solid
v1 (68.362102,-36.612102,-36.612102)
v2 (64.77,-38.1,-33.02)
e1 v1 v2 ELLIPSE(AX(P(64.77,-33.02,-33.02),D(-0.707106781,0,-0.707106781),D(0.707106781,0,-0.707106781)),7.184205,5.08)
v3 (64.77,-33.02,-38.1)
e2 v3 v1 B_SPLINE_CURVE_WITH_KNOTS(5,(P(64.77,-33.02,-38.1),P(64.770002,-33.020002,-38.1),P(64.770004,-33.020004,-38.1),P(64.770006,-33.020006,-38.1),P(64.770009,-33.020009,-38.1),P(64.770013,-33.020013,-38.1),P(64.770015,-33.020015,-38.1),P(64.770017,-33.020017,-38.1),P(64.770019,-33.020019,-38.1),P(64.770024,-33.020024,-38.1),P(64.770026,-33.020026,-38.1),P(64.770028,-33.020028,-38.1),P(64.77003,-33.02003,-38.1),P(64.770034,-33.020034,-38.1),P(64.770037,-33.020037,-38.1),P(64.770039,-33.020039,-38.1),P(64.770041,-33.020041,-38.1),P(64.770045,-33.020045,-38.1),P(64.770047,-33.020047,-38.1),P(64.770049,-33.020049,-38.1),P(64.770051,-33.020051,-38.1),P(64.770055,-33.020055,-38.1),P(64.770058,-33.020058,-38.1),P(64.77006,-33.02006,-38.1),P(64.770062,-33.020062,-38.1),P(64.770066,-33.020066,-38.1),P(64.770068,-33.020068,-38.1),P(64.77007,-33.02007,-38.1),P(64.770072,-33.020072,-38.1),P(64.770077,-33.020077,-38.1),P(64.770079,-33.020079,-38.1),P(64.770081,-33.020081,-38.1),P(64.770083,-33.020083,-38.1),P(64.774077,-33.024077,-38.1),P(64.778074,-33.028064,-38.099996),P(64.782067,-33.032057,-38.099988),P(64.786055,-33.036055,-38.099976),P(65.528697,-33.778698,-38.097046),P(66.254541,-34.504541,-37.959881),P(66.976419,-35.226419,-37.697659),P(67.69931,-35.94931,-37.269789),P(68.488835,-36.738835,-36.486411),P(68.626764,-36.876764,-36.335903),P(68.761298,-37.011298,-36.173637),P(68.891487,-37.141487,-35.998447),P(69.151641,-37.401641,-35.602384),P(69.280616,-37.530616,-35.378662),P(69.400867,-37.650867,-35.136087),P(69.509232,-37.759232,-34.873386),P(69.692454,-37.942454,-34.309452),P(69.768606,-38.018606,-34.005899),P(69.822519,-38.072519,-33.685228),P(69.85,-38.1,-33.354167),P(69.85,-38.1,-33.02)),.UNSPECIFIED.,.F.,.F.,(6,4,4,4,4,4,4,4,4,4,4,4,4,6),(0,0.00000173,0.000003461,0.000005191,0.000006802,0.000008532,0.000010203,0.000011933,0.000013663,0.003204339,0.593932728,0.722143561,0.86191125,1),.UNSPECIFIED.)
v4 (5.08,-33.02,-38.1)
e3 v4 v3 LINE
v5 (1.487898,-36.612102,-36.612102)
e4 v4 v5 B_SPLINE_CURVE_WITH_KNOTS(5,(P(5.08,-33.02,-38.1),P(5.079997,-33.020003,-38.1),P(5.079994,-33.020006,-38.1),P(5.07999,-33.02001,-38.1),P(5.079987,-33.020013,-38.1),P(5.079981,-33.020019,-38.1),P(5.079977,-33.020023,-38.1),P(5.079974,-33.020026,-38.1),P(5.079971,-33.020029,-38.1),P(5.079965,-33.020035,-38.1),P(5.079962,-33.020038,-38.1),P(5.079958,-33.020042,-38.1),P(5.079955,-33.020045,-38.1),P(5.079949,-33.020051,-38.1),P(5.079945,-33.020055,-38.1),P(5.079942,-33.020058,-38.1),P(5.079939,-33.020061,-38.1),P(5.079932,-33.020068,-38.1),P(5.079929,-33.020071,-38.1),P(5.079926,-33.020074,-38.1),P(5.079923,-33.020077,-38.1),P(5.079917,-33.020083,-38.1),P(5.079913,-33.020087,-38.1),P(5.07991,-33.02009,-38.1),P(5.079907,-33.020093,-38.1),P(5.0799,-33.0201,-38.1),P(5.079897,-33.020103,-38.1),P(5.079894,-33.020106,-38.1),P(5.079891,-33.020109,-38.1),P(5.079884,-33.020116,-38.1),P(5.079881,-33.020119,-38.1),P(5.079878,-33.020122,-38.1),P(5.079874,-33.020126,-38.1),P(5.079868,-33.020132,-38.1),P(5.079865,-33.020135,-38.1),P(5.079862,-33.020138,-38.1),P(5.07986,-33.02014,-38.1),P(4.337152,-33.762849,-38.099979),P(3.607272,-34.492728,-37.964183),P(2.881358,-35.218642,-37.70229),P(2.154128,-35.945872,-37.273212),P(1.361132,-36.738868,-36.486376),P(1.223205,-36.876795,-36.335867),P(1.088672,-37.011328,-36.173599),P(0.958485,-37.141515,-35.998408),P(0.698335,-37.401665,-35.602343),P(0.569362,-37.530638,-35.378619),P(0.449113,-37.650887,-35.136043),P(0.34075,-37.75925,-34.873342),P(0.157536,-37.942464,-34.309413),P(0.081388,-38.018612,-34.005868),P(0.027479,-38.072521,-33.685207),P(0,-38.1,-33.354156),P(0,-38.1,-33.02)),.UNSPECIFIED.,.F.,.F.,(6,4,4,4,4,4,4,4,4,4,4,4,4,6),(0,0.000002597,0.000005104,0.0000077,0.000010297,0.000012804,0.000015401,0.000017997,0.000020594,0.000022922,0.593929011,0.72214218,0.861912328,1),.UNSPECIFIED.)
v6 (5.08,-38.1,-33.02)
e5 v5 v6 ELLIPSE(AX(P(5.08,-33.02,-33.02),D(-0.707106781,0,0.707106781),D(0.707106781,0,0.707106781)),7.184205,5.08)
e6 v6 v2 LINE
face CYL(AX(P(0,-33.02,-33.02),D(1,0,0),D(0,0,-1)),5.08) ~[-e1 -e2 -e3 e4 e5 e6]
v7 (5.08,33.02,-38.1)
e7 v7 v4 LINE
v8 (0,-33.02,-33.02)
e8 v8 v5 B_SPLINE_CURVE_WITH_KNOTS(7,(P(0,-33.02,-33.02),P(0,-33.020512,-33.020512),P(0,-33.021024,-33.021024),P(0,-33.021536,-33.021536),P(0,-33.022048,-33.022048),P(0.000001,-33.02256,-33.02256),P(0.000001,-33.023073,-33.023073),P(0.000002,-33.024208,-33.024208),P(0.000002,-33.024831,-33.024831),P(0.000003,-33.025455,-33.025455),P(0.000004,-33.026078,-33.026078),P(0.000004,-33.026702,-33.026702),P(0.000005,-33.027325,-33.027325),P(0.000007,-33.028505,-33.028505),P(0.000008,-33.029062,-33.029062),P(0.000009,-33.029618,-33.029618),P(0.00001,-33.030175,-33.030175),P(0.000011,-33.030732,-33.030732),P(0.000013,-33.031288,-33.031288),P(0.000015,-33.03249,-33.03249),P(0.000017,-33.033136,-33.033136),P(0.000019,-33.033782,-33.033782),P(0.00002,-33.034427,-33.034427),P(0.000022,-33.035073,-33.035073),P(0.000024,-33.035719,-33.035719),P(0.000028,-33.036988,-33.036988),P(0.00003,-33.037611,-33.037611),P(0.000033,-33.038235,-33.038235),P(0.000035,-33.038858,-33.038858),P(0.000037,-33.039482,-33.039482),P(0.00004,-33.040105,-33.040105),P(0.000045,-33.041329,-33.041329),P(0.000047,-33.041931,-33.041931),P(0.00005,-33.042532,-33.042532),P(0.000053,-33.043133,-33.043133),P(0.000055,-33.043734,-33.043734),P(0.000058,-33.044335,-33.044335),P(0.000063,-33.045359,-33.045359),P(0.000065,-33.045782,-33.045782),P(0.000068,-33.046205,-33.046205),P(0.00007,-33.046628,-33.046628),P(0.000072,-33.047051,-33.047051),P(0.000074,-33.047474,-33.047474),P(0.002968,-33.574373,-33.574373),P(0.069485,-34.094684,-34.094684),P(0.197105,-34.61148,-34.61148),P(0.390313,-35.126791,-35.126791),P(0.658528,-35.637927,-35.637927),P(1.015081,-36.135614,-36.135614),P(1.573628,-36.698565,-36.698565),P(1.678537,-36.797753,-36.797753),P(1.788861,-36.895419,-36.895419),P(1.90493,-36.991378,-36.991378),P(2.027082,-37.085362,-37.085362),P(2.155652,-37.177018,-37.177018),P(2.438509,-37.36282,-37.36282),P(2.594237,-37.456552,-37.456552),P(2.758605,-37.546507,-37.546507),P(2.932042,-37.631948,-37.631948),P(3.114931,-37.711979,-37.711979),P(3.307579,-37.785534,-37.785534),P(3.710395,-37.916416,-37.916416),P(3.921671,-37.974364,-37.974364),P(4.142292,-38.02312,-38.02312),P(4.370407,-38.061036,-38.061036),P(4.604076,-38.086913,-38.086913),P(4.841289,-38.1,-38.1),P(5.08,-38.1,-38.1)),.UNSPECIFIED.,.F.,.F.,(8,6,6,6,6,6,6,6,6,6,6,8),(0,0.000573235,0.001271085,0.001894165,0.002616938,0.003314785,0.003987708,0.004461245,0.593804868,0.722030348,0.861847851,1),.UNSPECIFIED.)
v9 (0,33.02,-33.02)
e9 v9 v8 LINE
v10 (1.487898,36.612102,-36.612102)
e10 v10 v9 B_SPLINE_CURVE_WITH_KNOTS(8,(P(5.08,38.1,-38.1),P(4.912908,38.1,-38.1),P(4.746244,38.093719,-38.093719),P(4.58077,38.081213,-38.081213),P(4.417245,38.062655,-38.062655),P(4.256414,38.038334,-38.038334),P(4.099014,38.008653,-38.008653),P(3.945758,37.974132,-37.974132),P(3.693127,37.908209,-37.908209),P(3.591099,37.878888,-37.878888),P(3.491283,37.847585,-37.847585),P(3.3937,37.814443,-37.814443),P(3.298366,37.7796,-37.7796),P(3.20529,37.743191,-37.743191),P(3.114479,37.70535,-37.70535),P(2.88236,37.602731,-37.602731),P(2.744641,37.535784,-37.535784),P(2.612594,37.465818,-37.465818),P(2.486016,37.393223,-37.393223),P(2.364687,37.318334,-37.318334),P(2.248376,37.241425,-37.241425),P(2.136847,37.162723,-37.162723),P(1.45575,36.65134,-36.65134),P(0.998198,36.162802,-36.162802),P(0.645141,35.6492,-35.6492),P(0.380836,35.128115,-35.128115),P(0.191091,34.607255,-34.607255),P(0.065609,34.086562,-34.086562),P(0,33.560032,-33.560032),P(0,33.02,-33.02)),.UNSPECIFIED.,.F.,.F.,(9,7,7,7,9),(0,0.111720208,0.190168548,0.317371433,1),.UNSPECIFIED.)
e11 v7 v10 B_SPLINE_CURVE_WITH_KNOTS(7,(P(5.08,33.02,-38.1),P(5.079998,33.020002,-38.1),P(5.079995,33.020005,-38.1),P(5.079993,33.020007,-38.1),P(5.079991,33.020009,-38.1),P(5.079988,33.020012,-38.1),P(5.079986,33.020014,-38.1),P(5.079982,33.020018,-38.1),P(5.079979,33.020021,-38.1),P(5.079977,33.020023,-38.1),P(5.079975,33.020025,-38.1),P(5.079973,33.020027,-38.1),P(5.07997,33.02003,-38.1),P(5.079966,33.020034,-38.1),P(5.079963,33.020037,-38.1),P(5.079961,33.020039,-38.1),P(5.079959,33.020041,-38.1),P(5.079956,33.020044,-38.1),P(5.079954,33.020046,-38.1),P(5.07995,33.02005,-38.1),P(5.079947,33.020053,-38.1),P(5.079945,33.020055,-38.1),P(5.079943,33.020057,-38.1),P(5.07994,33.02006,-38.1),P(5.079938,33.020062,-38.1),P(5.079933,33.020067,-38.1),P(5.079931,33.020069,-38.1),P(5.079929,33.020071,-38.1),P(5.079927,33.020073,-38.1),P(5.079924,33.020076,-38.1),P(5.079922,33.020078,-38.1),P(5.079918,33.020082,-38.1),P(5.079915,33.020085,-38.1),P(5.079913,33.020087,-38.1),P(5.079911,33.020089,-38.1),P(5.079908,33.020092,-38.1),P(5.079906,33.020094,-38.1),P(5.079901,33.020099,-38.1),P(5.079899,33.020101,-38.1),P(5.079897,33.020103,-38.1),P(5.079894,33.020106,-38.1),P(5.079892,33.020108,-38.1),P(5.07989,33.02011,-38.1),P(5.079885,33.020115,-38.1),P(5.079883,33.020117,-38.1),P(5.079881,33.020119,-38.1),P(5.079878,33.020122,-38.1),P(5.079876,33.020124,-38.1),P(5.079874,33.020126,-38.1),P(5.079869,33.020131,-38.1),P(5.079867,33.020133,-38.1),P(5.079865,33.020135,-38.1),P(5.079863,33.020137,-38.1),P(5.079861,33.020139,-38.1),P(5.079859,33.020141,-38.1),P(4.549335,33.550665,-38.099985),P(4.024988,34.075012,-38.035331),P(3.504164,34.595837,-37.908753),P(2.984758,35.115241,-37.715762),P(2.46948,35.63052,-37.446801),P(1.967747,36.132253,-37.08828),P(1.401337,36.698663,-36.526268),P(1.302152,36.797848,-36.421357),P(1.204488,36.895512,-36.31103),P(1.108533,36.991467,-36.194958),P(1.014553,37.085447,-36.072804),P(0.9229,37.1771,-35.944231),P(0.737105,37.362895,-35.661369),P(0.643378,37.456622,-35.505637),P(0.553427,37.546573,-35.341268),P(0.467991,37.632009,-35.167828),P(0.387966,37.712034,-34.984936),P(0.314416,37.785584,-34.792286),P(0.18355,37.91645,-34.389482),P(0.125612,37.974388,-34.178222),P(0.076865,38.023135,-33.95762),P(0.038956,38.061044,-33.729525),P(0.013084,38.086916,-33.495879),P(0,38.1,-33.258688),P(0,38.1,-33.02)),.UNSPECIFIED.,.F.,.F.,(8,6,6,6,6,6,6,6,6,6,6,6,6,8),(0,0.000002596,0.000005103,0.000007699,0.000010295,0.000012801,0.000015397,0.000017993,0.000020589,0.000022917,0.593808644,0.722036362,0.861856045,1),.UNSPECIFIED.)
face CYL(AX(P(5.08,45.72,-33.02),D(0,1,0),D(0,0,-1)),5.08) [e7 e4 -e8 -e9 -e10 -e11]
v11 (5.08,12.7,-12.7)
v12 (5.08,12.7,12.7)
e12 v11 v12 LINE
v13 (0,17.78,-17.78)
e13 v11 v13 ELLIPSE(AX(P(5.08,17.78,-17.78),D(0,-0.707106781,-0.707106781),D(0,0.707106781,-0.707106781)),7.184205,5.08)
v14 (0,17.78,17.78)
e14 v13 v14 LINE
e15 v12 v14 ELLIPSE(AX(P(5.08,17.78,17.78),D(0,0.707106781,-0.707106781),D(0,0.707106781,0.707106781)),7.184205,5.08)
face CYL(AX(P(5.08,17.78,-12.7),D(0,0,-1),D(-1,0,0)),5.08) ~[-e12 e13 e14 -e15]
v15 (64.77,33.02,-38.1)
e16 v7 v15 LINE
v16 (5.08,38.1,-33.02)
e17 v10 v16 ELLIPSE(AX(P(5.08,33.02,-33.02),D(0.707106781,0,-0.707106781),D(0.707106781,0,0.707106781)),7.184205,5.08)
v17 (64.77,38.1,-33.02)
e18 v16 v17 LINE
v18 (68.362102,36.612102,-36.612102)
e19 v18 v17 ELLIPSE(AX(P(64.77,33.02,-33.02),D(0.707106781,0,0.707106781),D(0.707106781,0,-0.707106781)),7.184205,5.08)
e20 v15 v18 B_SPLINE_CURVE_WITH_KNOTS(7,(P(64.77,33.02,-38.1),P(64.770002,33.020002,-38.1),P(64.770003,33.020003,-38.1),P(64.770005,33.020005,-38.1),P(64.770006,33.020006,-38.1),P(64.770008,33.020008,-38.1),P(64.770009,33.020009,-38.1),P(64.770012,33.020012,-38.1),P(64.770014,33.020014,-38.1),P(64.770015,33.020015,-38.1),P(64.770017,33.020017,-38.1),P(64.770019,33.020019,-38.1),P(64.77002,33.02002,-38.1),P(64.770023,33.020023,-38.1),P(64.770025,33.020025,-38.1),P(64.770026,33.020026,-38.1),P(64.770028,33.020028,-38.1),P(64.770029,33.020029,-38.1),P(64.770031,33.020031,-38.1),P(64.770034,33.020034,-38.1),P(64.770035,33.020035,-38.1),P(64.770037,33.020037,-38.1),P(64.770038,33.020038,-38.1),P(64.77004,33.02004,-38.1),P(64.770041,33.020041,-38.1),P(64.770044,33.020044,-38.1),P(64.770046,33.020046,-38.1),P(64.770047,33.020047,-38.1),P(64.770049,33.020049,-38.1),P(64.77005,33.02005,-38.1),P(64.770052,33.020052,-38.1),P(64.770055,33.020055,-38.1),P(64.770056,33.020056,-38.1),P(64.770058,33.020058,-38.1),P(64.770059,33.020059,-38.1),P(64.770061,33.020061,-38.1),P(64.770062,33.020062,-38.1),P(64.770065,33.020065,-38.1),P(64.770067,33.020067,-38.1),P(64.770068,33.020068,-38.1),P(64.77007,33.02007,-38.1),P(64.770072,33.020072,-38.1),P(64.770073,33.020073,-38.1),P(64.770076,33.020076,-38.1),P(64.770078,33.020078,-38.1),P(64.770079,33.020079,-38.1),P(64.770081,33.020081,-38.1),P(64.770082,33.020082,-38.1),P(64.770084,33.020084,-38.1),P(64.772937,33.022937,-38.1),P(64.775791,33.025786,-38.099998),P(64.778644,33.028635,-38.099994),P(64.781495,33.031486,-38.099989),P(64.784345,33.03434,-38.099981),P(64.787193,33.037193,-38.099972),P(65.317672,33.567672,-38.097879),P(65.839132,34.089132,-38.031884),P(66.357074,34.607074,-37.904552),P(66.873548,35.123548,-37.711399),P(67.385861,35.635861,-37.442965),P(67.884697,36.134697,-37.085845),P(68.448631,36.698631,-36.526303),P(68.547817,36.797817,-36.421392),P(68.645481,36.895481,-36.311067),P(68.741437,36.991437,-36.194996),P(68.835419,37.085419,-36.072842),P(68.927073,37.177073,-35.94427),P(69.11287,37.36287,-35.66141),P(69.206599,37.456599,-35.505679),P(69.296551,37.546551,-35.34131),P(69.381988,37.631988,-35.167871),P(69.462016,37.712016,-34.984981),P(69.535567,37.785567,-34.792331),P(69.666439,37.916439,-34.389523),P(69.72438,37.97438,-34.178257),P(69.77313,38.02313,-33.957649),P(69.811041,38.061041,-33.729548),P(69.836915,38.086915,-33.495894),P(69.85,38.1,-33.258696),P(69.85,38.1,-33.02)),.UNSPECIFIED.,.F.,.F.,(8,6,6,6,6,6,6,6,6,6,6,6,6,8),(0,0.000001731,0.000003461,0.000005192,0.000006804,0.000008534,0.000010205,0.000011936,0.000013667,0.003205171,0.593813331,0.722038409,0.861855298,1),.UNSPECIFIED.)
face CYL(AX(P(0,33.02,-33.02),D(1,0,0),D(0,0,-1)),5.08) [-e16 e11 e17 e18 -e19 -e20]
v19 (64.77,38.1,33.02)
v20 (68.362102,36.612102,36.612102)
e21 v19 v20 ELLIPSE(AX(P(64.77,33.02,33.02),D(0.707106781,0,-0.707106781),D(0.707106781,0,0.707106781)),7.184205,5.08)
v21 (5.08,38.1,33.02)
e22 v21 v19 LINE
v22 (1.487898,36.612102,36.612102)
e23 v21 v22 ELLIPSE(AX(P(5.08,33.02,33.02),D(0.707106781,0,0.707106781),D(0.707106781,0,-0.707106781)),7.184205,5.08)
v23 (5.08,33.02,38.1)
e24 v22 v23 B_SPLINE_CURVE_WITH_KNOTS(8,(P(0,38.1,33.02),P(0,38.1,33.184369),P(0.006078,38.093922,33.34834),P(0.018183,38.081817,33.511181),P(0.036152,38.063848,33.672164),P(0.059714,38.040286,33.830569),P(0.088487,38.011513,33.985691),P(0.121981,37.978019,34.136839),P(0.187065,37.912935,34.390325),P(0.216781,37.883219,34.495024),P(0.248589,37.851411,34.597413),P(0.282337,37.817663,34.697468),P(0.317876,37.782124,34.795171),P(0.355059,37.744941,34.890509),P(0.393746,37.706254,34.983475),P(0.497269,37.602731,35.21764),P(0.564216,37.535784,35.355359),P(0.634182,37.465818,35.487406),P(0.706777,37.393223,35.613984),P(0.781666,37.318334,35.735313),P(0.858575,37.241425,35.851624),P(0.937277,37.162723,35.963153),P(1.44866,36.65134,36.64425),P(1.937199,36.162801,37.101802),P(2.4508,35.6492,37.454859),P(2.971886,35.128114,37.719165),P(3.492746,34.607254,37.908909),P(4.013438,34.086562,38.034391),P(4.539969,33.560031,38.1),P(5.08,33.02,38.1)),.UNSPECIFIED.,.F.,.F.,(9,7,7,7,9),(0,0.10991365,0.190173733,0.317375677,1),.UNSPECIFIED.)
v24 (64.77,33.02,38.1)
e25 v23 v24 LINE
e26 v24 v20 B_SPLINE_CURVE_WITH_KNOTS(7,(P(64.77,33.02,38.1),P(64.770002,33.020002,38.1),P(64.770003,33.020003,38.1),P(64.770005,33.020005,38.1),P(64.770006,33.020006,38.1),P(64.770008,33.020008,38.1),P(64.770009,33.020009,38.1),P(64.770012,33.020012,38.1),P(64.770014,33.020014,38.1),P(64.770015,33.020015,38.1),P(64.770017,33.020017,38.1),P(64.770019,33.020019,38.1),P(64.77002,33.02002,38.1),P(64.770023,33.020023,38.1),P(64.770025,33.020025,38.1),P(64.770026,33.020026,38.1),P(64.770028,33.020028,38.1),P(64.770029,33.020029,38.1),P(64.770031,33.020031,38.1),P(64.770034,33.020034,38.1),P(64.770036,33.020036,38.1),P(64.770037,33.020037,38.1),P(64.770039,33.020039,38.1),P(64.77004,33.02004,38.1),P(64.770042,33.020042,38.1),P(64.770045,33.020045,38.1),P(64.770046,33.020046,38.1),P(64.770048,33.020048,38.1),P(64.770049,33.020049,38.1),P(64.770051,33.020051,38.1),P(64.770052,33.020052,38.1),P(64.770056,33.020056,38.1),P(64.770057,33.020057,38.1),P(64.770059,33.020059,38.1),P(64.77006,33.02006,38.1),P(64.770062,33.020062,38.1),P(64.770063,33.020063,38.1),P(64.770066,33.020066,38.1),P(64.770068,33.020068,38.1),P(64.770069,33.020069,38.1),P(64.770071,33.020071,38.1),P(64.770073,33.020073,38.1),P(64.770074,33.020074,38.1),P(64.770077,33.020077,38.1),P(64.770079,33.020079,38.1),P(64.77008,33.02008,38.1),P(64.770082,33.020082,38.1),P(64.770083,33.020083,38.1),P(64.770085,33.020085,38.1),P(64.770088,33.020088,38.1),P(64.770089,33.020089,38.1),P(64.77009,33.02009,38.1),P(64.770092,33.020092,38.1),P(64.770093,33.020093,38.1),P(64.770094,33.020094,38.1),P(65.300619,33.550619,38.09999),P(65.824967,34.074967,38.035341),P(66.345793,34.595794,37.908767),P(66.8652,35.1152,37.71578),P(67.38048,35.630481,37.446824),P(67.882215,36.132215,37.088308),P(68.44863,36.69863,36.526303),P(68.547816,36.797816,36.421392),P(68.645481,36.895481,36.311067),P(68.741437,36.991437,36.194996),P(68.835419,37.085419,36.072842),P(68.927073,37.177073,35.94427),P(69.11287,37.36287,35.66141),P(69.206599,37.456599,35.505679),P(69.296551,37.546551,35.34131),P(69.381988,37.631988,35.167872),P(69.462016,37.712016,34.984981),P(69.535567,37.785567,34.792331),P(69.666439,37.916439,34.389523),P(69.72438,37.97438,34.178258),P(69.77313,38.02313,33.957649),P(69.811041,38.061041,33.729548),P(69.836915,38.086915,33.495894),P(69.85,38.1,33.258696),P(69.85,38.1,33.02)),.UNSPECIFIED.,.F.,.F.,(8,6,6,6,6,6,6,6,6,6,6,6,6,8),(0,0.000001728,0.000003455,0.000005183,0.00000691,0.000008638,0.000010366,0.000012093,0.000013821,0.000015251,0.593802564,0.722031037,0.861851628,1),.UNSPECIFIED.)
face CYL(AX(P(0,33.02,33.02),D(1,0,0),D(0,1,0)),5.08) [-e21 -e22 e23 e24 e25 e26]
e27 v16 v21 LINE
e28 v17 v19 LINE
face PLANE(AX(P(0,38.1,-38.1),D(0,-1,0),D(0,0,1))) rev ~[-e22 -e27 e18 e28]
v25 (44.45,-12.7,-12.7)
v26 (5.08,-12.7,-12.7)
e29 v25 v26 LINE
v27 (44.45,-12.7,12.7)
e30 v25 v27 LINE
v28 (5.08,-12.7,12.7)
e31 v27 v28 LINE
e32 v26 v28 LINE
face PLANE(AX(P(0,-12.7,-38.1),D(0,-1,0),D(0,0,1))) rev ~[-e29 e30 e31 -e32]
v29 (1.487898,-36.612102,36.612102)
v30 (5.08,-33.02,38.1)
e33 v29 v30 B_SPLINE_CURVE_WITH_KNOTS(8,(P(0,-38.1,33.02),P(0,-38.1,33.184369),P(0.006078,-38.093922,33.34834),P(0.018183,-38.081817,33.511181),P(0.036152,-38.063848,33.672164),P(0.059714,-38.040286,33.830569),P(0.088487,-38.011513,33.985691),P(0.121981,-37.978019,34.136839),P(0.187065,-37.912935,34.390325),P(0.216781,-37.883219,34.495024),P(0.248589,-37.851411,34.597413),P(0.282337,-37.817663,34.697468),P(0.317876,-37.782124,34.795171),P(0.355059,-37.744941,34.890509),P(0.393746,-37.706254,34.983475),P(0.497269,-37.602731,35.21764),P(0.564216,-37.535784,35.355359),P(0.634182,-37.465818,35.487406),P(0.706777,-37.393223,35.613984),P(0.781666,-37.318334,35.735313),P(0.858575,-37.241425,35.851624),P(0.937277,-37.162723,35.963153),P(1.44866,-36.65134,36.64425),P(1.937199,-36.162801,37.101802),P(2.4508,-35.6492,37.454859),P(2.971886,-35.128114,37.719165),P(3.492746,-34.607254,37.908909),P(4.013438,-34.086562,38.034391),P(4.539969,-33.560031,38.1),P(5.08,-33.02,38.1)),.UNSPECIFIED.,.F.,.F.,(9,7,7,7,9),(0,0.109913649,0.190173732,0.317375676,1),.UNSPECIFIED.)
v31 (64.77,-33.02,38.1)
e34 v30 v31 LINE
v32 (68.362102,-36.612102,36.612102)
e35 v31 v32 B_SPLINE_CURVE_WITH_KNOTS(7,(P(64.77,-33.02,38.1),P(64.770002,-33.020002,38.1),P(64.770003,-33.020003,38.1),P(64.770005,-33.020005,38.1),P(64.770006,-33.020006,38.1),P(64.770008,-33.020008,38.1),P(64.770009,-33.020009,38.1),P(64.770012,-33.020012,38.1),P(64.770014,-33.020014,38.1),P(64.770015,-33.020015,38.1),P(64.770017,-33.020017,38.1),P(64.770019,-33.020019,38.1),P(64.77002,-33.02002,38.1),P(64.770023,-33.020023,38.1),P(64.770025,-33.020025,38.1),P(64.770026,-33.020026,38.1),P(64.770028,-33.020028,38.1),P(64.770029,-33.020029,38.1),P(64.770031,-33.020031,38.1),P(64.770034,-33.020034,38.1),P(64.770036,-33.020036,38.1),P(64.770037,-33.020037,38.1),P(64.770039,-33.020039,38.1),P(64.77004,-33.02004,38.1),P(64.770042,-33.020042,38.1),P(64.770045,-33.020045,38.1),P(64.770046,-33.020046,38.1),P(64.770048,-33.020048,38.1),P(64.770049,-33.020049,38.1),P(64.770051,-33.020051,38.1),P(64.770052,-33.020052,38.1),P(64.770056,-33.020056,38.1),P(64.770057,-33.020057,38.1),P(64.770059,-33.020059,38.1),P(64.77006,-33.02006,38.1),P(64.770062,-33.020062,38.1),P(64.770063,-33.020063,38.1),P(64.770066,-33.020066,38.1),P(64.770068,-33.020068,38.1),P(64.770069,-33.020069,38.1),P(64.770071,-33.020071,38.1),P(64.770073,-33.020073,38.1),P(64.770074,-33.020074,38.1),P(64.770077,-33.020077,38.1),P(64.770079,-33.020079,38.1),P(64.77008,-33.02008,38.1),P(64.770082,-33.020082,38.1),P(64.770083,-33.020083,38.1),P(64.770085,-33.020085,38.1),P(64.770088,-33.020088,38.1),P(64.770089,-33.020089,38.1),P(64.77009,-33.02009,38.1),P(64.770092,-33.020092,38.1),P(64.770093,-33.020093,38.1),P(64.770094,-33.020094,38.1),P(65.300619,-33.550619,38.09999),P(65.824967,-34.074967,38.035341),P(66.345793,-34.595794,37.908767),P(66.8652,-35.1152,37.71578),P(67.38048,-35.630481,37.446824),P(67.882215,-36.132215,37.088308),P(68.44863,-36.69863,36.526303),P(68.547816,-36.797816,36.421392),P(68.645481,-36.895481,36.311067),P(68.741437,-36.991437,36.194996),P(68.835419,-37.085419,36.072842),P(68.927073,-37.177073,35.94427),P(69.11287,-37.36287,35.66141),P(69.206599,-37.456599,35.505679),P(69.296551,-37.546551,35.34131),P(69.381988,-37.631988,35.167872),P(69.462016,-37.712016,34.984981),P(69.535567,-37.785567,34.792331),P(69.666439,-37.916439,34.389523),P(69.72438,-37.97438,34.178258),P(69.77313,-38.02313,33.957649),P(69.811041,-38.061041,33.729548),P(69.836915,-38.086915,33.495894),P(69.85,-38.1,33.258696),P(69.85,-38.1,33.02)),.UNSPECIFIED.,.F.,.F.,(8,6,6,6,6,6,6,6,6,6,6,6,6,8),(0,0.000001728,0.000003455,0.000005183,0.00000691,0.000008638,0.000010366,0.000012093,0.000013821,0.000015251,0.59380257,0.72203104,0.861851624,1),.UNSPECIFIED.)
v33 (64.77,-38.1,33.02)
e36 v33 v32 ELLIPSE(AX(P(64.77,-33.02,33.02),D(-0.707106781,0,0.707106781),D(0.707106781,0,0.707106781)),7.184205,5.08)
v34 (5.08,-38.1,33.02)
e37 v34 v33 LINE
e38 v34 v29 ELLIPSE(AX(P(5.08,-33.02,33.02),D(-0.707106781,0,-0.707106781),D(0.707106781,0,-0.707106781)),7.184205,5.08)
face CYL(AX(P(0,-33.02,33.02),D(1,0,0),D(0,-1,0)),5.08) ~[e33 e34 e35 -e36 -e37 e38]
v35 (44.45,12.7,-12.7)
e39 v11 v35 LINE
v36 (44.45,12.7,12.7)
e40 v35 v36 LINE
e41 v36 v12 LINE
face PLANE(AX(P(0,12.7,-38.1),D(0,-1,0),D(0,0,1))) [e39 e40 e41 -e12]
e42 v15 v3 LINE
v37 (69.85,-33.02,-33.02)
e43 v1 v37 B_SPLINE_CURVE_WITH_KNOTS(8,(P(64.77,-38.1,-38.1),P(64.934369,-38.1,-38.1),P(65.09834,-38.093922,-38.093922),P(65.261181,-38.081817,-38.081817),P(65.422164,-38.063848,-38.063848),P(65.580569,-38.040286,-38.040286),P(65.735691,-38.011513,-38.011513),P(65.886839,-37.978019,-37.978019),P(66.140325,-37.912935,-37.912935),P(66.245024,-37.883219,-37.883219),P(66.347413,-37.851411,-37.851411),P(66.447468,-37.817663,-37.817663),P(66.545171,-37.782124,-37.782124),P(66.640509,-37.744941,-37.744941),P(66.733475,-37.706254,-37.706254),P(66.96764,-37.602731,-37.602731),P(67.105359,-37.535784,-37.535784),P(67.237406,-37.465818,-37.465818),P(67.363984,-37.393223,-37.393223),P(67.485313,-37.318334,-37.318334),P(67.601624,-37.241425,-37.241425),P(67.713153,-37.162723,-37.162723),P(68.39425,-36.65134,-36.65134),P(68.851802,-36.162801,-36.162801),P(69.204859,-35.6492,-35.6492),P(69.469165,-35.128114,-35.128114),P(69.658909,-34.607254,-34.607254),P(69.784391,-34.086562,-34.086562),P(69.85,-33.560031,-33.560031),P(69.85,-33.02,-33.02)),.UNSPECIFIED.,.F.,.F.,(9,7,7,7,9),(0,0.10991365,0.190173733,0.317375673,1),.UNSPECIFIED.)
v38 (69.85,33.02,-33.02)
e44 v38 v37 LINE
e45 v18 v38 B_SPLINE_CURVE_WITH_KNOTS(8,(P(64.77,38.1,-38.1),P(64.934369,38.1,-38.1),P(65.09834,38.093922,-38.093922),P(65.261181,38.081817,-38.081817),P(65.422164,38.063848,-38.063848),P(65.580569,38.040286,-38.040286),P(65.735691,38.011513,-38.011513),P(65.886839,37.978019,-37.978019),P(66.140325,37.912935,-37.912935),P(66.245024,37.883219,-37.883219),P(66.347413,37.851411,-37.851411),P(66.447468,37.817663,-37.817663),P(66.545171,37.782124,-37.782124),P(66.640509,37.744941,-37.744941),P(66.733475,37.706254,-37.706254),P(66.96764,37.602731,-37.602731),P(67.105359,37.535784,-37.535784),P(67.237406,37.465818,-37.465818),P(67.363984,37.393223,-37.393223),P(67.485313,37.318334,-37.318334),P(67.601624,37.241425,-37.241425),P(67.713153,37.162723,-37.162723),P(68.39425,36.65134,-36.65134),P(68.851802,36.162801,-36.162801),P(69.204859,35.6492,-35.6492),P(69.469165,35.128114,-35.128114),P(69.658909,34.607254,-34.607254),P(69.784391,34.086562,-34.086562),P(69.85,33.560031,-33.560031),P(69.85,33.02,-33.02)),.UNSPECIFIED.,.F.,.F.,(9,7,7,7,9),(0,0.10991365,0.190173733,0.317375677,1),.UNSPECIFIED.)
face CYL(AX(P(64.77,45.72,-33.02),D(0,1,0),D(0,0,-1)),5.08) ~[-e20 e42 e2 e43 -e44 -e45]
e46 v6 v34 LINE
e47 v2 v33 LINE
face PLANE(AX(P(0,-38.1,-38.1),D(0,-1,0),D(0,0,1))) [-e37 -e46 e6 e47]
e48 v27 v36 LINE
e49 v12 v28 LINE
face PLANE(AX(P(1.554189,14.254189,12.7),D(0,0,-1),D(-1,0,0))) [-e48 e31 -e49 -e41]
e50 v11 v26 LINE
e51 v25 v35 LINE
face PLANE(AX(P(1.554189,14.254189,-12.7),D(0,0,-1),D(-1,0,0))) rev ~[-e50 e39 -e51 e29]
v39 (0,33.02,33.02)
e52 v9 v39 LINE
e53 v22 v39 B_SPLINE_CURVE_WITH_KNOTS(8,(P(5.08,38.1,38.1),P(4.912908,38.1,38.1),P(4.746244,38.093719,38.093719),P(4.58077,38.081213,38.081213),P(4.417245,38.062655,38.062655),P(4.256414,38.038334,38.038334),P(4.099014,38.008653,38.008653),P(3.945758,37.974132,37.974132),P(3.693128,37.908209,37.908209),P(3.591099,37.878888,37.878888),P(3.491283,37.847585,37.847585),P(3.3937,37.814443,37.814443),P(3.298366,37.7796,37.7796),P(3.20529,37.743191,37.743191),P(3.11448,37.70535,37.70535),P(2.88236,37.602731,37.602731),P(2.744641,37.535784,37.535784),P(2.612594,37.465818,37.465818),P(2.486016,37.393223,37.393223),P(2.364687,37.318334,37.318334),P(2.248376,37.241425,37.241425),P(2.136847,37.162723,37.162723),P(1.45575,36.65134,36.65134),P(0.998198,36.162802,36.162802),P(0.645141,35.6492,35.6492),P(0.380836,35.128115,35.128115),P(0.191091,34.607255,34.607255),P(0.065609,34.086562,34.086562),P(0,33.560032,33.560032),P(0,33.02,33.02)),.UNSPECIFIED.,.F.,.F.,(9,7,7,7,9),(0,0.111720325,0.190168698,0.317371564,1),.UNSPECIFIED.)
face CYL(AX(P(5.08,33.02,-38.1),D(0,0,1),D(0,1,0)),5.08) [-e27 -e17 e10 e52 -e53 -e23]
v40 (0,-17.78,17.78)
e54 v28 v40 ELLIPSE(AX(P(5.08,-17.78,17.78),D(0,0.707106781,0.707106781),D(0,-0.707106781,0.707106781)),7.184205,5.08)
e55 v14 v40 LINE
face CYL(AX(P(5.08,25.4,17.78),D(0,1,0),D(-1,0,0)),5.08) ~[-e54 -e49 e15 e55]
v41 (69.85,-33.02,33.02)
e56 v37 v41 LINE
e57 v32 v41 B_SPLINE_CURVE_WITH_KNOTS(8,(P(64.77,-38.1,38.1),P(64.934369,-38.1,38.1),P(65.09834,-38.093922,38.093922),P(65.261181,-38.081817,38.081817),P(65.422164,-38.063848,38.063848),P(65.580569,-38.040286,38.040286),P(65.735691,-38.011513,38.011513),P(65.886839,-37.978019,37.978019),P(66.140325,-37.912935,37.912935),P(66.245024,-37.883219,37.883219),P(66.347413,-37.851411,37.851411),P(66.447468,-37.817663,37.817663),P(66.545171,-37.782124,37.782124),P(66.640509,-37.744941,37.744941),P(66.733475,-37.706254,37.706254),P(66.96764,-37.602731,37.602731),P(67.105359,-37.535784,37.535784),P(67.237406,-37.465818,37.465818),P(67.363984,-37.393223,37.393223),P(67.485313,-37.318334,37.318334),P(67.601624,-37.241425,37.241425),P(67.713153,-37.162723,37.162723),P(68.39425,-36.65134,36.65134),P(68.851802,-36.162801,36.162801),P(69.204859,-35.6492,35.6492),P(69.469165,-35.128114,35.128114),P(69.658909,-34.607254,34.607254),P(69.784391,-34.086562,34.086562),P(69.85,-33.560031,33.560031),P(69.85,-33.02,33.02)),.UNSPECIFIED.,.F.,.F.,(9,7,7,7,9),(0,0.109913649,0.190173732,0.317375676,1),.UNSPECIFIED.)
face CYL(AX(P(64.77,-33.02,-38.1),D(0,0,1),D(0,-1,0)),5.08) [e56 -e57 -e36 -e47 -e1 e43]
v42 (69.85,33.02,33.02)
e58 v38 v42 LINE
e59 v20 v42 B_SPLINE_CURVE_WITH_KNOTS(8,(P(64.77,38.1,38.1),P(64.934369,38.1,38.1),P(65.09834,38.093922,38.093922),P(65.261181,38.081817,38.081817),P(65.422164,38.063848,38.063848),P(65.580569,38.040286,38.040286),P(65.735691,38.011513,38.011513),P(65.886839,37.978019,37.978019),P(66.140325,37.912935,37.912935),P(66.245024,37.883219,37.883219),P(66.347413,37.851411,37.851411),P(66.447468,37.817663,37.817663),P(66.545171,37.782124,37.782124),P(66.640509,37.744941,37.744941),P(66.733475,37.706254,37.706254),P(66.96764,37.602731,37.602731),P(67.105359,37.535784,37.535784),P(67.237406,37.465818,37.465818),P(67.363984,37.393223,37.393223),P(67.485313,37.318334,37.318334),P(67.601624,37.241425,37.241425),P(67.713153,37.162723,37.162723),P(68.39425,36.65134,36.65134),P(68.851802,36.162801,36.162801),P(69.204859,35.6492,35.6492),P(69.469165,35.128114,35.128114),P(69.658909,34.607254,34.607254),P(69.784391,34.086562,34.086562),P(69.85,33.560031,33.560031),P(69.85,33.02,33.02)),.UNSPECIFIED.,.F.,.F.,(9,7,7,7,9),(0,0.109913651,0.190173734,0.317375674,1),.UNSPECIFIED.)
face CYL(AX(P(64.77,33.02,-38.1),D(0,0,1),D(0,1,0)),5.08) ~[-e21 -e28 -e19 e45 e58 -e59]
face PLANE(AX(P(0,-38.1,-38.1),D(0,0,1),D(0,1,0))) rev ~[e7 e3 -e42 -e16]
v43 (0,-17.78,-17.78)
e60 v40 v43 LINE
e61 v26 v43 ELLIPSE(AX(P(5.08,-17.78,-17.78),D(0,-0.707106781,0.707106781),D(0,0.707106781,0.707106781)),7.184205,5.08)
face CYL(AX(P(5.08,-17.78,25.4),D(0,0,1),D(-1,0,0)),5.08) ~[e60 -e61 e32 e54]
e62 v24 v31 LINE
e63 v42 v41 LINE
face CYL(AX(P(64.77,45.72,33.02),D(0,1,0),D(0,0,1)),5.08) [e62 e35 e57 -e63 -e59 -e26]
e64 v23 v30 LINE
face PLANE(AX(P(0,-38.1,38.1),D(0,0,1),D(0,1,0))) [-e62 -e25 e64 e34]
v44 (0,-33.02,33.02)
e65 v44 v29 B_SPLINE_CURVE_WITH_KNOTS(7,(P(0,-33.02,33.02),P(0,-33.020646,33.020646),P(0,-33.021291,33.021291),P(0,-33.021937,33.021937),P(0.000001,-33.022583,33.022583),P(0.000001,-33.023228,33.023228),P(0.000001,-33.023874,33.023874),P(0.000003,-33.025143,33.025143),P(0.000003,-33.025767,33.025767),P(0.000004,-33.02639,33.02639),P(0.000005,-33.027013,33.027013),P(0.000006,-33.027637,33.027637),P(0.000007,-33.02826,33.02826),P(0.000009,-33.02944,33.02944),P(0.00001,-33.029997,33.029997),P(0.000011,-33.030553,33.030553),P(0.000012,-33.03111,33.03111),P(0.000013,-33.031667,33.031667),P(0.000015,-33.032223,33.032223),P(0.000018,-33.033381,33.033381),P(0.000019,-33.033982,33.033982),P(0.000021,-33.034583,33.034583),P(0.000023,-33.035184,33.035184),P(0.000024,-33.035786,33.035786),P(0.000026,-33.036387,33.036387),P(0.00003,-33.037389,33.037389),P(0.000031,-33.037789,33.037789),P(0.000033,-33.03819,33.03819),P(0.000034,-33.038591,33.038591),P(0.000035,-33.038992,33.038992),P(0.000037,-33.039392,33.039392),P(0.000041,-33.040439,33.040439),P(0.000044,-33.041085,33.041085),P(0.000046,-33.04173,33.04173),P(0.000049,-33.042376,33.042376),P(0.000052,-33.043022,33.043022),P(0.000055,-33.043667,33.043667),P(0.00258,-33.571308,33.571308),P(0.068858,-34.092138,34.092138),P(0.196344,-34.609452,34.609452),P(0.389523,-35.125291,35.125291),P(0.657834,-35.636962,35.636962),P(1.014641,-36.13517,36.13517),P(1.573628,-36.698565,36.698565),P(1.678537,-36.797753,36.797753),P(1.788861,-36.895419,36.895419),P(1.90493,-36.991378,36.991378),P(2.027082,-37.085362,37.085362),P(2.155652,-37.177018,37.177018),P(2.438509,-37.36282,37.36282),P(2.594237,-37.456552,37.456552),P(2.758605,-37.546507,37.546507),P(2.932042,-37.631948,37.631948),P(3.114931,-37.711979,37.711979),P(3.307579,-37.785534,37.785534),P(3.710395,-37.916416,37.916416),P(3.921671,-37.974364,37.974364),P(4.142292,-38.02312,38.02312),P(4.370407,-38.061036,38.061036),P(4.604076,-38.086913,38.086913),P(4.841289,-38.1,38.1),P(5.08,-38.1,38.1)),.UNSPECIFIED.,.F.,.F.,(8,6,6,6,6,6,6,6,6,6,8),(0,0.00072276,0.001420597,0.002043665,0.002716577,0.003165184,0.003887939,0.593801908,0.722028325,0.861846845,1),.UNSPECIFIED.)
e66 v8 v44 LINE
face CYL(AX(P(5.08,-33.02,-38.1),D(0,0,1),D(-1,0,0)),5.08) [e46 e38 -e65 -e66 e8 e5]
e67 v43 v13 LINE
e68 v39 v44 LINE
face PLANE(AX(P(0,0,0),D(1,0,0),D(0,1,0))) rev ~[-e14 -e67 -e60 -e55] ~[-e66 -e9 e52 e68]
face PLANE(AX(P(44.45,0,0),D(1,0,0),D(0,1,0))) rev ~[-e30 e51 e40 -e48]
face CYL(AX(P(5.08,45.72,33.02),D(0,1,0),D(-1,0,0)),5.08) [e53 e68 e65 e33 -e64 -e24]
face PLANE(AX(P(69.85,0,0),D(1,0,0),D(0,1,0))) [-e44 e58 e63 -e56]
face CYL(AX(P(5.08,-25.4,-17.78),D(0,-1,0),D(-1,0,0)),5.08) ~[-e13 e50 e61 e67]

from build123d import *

# Parameters (mm, degrees)
F0_W         = 76.2
F0_H         = 76.2
F1_DEPTH     = 69.85
F2_T         = -25.4
F3_R         = 5.08
F4_R         = 5.08
F5_T1_DEPTH  = 91.44
F5_T3_DEPTH  = 25.4
F5_T5_DEPTH  = 25.4
F5_T11_DEPTH = 38.1
F5_T15_DEPTH = 38.1
F5_T22_DEPTH = 38.1
F5_T26_DEPTH = 38.1
F5_T33_DEPTH = 38.1
F5_T37_DEPTH = 38.1
F5_T44_DEPTH = 38.1
F5_T48_DEPTH = 38.1
F6_T1_DEPTH  = 91.44


# Not quite as in the source:
# - a fillet or chamfer that OpenCascade refuses, or shapes differently, is made with other operations: its cross-section is extruded or revolved along the edge and cut away or added


with BuildPart() as f1:
    # F0 (on Right) → F1 (new body)
    with BuildSketch(Plane.YZ):
        Rectangle(F0_W, F0_H)
    extrude(amount=F1_DEPTH)

    # F2
    f2_openings = [f1.faces().sort_by_distance(p)[0] for p in [
        (0, 0, 0),
    ]]
    offset(amount=F2_T, openings=f2_openings)

    # F3
    f3_edges = [f1.edges().sort_by_distance(p)[0] for p in [
        (34.925, 38.1, -38.1),
        (34.925, 38.1, 38.1),
        (0, 38.1, 0),
        (69.85, 38.1, 0),
    ]]
    fillet(f3_edges, radius=F3_R)

    # F4
    f4_edges = [f1.edges().sort_by_distance(p)[0] for p in [
        (34.925, -38.1, 38.1),
        (34.925, -38.1, -38.1),
        (0, -38.1, 0),
        (69.85, -38.1, 0),
    ]]
    fillet(f4_edges, radius=F4_R)

    # F5: fillet of radius 5.08 on 8 edges, made by hand

    # F5_s2 → F5_t1 (cut)
    with BuildSketch(Plane.XZ.offset(-45.72)):
        with BuildLine():
            ThreePointArc((5.08, -38.1), (1.4878975516, -36.6121024484), (0, -33.02))
            Line((0, -33.02), (0, -38.1))
            Line((0, -38.1), (5.08, -38.1))
        make_face()
        with BuildLine():
            ThreePointArc((0, 33.02), (1.4878975516, 36.6121024484), (5.08, 38.1))
            Line((5.08, 38.1), (0, 38.1))
            Line((0, 38.1), (0, 33.02))
        make_face()
    extrude(amount=F5_T1_DEPTH, mode=Mode.SUBTRACT)

    # F5_s4 → F5_t3 (cut)
    with BuildSketch(Plane.XY.offset(-12.7)):
        with BuildLine():
            ThreePointArc((0, -17.78), (1.4878975516, -14.1878975516), (5.08, -12.7))
            Line((5.08, -12.7), (0, -12.7))
            Line((0, -12.7), (0, -17.78))
        make_face()
        with BuildLine():
            ThreePointArc((0, 17.78), (1.4878975516, 14.1878975516), (5.08, 12.7))
            Line((5.08, 12.7), (0, 12.7))
            Line((0, 12.7), (0, 17.78))
        make_face()
    extrude(amount=F5_T3_DEPTH, mode=Mode.SUBTRACT)

    # F5_s6 → F5_t5 (cut)
    with BuildSketch(Plane.XZ.offset(-12.7)):
        with BuildLine():
            ThreePointArc((0, 17.78), (1.4878975516, 14.1878975516), (5.08, 12.7))
            Line((5.08, 12.7), (0, 12.7))
            Line((0, 12.7), (0, 17.78))
        make_face()
        with BuildLine():
            ThreePointArc((0, -17.78), (1.4878975516, -14.1878975516), (5.08, -12.7))
            Line((5.08, -12.7), (0, -12.7))
            Line((0, -12.7), (0, -17.78))
        make_face()
    extrude(amount=F5_T5_DEPTH, mode=Mode.SUBTRACT)


with BuildPart() as f5_tool9:
    # F5_s10 → F5_t11 (new body)
    with BuildSketch(Plane.XY.offset(25.4)):
        with BuildLine():
            ThreePointArc((0, -17.78), (1.4878975516, -14.1878975516), (5.08, -12.7))
            Line((5.08, -12.7), (0, -12.7))
            Line((0, -12.7), (0, -17.78))
        make_face()
    extrude(amount=-F5_T11_DEPTH)

    split(bisect_by=Plane.XY.offset(12.7), keep=Keep.TOP)


with BuildPart() as f5_tool13:
    # F5_s14 → F5_t15 (new body)
    with BuildSketch(Plane.XZ.offset(-12.7)):
        with BuildLine():
            ThreePointArc((0, 17.78), (1.4878975516, 14.1878975516), (5.08, 12.7))
            Line((5.08, 12.7), (0, 12.7))
            Line((0, 12.7), (0, 17.78))
        make_face()
    extrude(amount=F5_T15_DEPTH)

    split(bisect_by=Plane.XZ.offset(12.7), keep=Keep.TOP)


with BuildPart() as f5_tool9_1:
    add(f5_tool9.part)

    # F5_t17: intersect F5_tool13
    add(f5_tool13.part, mode=Mode.INTERSECT)


with BuildPart() as f1_1:
    add(f1.part)

    # F5_t7: cut F5_tool9
    add(f5_tool9_1.part, mode=Mode.SUBTRACT)


with BuildPart() as f5_tool20:
    # F5_s21 → F5_t22 (new body)
    with BuildSketch(Plane.XY.offset(12.7)):
        with BuildLine():
            ThreePointArc((0, -17.78), (1.4878975516, -14.1878975516), (5.08, -12.7))
            Line((5.08, -12.7), (0, -12.7))
            Line((0, -12.7), (0, -17.78))
        make_face()
    extrude(amount=-F5_T22_DEPTH)

    split(bisect_by=Plane.XY.offset(-12.7), keep=Keep.BOTTOM)


with BuildPart() as f5_tool24:
    # F5_s25 → F5_t26 (new body)
    with BuildSketch(Plane.XZ.offset(25.4)):
        with BuildLine():
            ThreePointArc((0, -17.78), (1.4878975516, -14.1878975516), (5.08, -12.7))
            Line((5.08, -12.7), (0, -12.7))
            Line((0, -12.7), (0, -17.78))
        make_face()
    extrude(amount=-F5_T26_DEPTH)

    split(bisect_by=Plane.XZ.offset(12.7), keep=Keep.TOP)


with BuildPart() as f5_tool20_1:
    add(f5_tool20.part)

    # F5_t28: intersect F5_tool24
    add(f5_tool24.part, mode=Mode.INTERSECT)


with BuildPart() as f1_2:
    add(f1_1.part)

    # F5_t18: cut F5_tool20
    add(f5_tool20_1.part, mode=Mode.SUBTRACT)


with BuildPart() as f5_tool31:
    # F5_s32 → F5_t33 (new body)
    with BuildSketch(Plane.XZ.offset(-25.4)):
        with BuildLine():
            ThreePointArc((0, 17.78), (1.4878975516, 14.1878975516), (5.08, 12.7))
            Line((5.08, 12.7), (0, 12.7))
            Line((0, 12.7), (0, 17.78))
        make_face()
    extrude(amount=F5_T33_DEPTH)

    split(bisect_by=Plane.XZ.offset(-12.7), keep=Keep.BOTTOM)


with BuildPart() as f5_tool35:
    # F5_s36 → F5_t37 (new body)
    with BuildSketch(Plane.XY.offset(-12.7)):
        with BuildLine():
            ThreePointArc((0, 17.78), (1.4878975516, 14.1878975516), (5.08, 12.7))
            Line((5.08, 12.7), (0, 12.7))
            Line((0, 12.7), (0, 17.78))
        make_face()
    extrude(amount=F5_T37_DEPTH)

    split(bisect_by=Plane.XY.offset(12.7), keep=Keep.TOP)


with BuildPart() as f5_tool31_1:
    add(f5_tool31.part)

    # F5_t39: intersect F5_tool35
    add(f5_tool35.part, mode=Mode.INTERSECT)


with BuildPart() as f1_3:
    add(f1_2.part)

    # F5_t29: cut F5_tool31
    add(f5_tool31_1.part, mode=Mode.SUBTRACT)


with BuildPart() as f5_tool42:
    # F5_s43 → F5_t44 (new body)
    with BuildSketch(Plane.XY.offset(-25.4)):
        with BuildLine():
            ThreePointArc((0, 17.78), (1.4878975516, 14.1878975516), (5.08, 12.7))
            Line((5.08, 12.7), (0, 12.7))
            Line((0, 12.7), (0, 17.78))
        make_face()
    extrude(amount=F5_T44_DEPTH)

    split(bisect_by=Plane.XY.offset(-12.7), keep=Keep.BOTTOM)


with BuildPart() as f5_tool46:
    # F5_s47 → F5_t48 (new body)
    with BuildSketch(Plane.XZ.offset(12.7)):
        with BuildLine():
            ThreePointArc((0, -17.78), (1.4878975516, -14.1878975516), (5.08, -12.7))
            Line((5.08, -12.7), (0, -12.7))
            Line((0, -12.7), (0, -17.78))
        make_face()
    extrude(amount=-F5_T48_DEPTH)

    split(bisect_by=Plane.XZ.offset(-12.7), keep=Keep.BOTTOM)


with BuildPart() as f5_tool42_1:
    add(f5_tool42.part)

    # F5_t50: intersect F5_tool46
    add(f5_tool46.part, mode=Mode.INTERSECT)


with BuildPart() as f1_4:
    add(f1_3.part)

    # F5_t40: cut F5_tool42
    add(f5_tool42_1.part, mode=Mode.SUBTRACT)

    # F6: fillet of radius 5.08 on 4 edges, made by hand

    # F6_s2 → F6_t1 (cut)
    with BuildSketch(Plane.XZ.offset(-45.72)):
        with BuildLine():
            ThreePointArc((64.77, -38.1), (68.3621024484, -36.6121024484), (69.85, -33.02))
            Line((69.85, -33.02), (69.85, -38.1))
            Line((69.85, -38.1), (64.77, -38.1))
        make_face()
        with BuildLine():
            ThreePointArc((64.77, 38.1), (68.3621024484, 36.6121024484), (69.85, 33.02))
            Line((69.85, 33.02), (69.85, 38.1))
            Line((69.85, 38.1), (64.77, 38.1))
        make_face()
    extrude(amount=F6_T1_DEPTH, mode=Mode.SUBTRACT)


solid = f1_4.part
